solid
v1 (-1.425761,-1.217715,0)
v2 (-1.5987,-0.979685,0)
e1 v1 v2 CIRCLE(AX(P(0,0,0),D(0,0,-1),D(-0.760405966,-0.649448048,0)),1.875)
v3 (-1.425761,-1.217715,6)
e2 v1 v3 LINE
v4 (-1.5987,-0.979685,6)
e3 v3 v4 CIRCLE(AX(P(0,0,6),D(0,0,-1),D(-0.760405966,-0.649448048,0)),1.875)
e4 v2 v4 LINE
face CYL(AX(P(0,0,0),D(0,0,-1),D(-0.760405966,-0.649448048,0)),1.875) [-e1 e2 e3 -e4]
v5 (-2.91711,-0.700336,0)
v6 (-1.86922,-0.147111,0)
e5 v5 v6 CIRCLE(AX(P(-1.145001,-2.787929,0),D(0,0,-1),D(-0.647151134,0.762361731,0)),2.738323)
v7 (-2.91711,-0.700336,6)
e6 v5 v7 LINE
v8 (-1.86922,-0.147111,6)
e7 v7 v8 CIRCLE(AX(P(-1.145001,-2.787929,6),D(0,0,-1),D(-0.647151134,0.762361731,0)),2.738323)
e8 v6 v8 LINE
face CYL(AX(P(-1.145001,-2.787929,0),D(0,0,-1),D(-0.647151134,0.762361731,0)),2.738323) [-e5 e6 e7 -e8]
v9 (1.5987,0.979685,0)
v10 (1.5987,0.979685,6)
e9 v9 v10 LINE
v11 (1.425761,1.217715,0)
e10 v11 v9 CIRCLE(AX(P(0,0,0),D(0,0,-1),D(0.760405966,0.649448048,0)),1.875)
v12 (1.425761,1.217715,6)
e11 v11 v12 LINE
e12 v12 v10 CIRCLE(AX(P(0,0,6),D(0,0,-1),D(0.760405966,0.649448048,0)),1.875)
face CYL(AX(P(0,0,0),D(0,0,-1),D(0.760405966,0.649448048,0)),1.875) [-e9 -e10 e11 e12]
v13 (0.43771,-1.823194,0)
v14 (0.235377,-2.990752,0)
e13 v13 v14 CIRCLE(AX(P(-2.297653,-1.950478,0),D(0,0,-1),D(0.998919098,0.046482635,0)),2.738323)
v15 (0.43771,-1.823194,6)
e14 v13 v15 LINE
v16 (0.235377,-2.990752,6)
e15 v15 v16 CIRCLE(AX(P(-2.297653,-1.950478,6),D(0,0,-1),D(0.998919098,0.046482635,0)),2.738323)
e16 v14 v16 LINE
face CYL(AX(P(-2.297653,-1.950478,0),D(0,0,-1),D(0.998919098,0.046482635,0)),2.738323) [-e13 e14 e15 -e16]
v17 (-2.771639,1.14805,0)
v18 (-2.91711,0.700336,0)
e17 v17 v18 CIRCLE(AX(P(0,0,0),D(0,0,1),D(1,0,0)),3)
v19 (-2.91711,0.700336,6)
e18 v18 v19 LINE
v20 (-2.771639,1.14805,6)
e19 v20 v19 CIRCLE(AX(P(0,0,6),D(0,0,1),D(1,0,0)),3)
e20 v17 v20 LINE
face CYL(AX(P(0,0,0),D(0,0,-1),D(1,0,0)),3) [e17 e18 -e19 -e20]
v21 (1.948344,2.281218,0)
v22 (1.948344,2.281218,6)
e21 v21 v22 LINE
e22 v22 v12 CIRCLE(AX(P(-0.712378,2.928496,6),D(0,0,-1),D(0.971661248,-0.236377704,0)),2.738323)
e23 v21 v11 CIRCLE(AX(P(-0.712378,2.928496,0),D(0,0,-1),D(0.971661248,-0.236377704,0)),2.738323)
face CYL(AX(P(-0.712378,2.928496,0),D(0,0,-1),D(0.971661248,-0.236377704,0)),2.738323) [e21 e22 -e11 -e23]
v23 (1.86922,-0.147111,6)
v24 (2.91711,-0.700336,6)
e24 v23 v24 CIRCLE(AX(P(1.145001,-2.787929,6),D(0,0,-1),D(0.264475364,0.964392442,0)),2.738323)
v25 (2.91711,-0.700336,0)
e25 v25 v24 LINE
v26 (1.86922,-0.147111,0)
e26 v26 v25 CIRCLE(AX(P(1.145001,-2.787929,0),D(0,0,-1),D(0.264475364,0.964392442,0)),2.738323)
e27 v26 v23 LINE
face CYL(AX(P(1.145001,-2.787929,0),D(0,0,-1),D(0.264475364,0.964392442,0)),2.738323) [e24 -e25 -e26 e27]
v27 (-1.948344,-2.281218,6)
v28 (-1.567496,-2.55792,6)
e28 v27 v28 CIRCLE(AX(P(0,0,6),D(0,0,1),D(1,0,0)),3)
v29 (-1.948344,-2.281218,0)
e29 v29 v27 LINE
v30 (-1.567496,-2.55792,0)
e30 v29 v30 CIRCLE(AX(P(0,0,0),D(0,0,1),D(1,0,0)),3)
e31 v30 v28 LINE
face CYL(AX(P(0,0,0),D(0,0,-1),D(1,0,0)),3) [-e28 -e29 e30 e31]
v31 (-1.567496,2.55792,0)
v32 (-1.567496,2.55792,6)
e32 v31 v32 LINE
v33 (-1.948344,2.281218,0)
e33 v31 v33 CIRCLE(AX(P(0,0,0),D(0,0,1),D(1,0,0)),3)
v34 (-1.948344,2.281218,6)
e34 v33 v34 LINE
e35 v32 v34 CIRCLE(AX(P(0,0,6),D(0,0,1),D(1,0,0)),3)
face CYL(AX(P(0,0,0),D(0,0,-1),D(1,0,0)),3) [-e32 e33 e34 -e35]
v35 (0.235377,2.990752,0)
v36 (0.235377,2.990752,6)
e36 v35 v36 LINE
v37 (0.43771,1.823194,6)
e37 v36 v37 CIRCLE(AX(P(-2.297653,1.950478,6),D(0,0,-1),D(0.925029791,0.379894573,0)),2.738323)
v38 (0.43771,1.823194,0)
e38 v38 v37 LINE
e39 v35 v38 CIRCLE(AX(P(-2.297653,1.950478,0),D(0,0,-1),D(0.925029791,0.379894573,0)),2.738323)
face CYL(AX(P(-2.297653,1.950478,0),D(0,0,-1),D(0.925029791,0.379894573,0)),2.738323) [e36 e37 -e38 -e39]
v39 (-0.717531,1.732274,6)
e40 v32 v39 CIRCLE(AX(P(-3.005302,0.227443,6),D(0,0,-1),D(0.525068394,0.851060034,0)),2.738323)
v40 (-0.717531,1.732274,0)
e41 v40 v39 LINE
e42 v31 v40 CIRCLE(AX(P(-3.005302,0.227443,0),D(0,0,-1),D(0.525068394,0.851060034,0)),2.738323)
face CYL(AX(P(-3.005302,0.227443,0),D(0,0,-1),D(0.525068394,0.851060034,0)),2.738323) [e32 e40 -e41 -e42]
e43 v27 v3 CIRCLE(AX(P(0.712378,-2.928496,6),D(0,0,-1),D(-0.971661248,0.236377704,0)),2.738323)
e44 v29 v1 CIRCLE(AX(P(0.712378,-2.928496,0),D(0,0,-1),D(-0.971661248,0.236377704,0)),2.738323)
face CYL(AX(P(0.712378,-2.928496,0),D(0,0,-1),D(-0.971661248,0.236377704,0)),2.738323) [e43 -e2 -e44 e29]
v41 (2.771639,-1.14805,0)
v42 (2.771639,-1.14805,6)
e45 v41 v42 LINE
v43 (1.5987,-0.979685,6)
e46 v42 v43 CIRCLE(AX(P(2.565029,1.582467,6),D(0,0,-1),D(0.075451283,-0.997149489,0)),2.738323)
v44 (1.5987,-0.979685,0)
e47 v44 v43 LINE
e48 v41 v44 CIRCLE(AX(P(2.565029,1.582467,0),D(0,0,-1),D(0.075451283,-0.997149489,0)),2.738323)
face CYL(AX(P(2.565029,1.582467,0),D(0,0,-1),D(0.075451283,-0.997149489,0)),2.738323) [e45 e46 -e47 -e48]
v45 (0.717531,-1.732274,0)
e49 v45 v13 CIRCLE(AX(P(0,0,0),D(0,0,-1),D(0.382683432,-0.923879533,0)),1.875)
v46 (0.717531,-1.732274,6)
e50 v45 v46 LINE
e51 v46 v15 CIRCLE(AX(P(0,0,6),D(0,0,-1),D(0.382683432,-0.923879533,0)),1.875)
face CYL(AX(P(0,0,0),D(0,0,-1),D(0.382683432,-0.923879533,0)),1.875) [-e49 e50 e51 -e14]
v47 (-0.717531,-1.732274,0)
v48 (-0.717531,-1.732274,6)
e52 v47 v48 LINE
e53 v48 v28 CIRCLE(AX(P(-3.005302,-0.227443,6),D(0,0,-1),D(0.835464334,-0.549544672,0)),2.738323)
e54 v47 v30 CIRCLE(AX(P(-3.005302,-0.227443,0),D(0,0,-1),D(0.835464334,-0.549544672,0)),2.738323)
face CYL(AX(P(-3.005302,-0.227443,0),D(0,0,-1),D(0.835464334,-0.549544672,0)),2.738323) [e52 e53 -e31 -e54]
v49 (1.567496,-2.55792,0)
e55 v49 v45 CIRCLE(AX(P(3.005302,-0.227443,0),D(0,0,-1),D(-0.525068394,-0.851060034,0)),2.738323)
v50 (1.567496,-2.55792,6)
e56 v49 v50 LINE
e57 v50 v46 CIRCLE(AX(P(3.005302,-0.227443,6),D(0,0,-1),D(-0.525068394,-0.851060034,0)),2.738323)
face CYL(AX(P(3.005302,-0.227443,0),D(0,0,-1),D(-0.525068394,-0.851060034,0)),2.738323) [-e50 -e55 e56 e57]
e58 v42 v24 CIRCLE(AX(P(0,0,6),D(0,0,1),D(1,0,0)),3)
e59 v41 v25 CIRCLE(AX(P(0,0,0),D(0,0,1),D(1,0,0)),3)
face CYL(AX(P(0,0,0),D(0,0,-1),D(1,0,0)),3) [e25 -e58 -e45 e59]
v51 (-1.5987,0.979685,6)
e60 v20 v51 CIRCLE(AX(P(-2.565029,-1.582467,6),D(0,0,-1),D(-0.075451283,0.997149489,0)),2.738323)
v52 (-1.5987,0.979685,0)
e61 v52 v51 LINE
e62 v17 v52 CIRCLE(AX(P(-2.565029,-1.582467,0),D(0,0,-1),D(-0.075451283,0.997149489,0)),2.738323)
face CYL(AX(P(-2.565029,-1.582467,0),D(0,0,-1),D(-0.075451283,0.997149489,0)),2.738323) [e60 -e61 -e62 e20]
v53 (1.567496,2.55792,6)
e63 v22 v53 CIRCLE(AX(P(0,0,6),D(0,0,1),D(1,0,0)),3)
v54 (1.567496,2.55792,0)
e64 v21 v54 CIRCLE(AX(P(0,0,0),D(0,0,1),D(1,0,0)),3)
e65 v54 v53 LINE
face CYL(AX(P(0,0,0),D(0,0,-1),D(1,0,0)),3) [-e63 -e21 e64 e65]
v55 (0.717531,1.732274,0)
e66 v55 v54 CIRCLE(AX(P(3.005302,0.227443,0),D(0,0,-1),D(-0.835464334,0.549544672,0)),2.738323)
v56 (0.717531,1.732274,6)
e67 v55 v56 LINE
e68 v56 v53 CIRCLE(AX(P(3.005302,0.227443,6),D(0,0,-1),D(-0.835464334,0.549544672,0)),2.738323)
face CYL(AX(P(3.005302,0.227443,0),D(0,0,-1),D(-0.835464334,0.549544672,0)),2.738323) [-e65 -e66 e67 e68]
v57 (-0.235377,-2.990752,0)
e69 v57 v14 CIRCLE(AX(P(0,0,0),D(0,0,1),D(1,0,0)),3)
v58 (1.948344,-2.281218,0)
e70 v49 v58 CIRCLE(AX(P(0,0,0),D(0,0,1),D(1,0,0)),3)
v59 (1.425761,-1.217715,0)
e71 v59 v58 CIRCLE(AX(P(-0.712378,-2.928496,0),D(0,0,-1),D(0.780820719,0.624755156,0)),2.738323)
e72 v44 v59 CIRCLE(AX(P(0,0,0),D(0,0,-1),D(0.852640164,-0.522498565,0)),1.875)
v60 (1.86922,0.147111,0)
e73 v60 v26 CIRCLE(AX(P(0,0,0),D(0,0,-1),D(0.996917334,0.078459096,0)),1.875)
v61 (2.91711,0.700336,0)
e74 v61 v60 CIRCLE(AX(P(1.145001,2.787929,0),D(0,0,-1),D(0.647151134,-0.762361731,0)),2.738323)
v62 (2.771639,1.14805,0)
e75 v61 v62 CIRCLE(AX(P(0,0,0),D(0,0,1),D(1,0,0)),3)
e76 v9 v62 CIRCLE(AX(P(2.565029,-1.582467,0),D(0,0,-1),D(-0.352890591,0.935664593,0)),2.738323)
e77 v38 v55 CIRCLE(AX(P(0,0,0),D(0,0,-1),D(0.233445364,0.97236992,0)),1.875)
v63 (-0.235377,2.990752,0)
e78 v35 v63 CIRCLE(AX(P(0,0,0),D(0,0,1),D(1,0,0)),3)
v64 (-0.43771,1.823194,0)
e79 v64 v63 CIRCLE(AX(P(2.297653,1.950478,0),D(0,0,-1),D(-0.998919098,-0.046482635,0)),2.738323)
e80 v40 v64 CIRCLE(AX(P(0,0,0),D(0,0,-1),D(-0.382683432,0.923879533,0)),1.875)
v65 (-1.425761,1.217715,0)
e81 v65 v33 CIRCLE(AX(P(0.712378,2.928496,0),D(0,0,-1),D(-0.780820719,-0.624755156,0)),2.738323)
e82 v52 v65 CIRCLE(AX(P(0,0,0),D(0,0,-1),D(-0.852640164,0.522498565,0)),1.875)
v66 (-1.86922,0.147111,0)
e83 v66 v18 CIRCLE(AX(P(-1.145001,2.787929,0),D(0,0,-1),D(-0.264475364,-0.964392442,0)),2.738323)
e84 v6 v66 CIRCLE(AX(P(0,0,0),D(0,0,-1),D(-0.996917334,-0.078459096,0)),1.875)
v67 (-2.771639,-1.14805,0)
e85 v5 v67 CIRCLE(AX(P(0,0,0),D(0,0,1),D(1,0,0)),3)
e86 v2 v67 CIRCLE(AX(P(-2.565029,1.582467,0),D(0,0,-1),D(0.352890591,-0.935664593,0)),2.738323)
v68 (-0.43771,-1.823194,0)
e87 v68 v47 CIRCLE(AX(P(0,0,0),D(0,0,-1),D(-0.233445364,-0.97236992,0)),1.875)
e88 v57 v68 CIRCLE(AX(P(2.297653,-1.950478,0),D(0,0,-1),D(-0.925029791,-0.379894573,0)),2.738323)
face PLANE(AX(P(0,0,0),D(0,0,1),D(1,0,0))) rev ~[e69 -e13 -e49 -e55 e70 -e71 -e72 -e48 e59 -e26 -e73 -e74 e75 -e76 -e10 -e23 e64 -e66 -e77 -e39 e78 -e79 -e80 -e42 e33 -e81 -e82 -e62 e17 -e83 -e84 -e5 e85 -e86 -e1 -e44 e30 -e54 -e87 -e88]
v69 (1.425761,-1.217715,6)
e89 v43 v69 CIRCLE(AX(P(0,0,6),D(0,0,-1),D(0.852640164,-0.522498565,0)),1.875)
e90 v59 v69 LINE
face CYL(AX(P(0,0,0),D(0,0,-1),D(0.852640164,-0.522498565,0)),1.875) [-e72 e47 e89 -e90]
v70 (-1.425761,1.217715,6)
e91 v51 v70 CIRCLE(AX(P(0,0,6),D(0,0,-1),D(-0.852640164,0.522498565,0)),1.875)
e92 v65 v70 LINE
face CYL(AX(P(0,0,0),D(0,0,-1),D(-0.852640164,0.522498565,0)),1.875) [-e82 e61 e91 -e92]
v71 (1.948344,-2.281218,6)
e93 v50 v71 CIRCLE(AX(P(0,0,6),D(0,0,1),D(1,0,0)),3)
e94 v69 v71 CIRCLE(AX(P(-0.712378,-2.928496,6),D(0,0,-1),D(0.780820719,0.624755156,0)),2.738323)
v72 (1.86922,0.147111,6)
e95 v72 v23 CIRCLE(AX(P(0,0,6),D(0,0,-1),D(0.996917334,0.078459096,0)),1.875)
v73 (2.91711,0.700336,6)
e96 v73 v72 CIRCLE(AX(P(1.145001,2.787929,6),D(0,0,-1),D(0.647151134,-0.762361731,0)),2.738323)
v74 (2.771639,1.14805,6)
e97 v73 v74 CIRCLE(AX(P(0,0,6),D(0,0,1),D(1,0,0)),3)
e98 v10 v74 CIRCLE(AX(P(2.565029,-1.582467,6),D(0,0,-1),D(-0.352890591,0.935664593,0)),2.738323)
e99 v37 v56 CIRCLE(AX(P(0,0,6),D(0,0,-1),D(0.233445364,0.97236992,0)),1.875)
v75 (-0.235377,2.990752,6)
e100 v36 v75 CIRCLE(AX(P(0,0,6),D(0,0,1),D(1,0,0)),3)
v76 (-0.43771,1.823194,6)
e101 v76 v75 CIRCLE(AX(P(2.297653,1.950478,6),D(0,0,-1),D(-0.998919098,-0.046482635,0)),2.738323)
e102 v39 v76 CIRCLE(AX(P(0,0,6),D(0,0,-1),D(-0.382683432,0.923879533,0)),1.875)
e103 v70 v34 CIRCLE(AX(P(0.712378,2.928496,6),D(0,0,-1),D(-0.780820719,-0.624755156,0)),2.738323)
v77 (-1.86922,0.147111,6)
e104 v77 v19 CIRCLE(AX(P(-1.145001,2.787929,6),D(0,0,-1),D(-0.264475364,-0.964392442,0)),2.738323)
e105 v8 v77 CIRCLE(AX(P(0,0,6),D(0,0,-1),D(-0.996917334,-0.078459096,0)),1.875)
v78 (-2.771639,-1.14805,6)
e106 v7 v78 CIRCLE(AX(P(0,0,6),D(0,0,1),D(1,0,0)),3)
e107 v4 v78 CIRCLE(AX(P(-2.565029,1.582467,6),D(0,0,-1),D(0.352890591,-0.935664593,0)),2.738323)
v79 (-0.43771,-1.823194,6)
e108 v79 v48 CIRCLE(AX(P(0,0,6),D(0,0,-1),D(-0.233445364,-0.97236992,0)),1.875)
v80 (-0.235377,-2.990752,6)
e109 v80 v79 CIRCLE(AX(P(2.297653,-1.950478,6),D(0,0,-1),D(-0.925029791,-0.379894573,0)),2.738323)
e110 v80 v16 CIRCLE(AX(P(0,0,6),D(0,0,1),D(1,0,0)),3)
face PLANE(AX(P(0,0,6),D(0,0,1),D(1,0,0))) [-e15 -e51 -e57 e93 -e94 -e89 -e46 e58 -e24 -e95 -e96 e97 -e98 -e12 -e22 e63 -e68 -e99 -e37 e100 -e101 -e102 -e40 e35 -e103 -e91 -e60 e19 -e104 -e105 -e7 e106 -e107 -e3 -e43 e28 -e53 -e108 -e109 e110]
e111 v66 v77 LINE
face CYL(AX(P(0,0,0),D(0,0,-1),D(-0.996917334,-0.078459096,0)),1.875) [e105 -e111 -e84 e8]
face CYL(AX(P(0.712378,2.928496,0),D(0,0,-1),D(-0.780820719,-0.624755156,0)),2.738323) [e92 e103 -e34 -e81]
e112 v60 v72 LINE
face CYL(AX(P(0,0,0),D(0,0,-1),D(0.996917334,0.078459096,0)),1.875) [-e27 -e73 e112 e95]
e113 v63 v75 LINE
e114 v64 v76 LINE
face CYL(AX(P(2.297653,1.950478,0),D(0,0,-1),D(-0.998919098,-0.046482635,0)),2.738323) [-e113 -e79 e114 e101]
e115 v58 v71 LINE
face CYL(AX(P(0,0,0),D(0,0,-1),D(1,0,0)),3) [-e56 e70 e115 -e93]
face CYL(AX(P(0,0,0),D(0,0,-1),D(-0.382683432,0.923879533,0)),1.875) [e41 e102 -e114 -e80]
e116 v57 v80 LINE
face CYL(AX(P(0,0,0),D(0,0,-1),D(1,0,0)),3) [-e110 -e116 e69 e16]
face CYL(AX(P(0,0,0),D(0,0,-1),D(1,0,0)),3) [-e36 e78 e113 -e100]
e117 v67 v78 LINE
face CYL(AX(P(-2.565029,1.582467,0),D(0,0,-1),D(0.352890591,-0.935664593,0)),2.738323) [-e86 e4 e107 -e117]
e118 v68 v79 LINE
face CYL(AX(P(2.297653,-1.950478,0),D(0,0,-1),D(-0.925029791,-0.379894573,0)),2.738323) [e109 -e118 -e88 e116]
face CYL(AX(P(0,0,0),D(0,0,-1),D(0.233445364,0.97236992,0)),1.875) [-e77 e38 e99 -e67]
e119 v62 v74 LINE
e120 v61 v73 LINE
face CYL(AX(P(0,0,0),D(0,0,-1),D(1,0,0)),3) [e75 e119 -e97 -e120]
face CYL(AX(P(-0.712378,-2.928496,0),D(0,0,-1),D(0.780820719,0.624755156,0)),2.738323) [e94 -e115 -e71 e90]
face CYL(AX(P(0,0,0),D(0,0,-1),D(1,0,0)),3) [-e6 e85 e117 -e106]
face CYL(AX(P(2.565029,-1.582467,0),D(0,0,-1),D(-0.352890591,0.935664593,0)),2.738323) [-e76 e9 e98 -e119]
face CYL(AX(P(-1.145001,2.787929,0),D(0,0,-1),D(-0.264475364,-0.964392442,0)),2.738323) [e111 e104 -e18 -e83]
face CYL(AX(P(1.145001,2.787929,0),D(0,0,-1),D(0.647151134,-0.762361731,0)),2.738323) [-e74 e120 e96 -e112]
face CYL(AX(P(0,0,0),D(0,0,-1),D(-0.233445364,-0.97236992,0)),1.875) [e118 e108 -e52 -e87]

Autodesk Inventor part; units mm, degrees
sketch "Sketch1" plane through (0, 0, 0) normal (0, 0, 1) x (1, 0, 0)
  circle A0 centre (0, 0) radius 3
  dimension "d0" = 6
extrude "Extrusion1" add sketch "Sketch1" along normal blind 6
ref_plane "Work Plane2" through (0, 0, 3) normal (0, 0, 1) x (1, 0, 0)
sketch "Sketch2" plane through (0, 0, 0) normal (0, 0, -1) x (-1, 0, 0)
  circle A0 centre (0, 0) radius 3 projected
  circle A1 centre (0, 0) radius 2.5
  dimension "d3" = 5
surface extrude "Pitch Diameter" sketch "Sketch2" against normal through all shown no curves A1
ref_plane "Work Plane8" through (0, 0, 0) normal (0.9510565, 0.309017, 0) x (0, 0, 1)
ref_plane "Work Plane9" through (0, 0, 0) normal (1, 0, 0) x (0, 1, 0)
spur gear teeth "Spur Gear" teeth 10 pitch diameter 5 tip diameter 6 root diameter 3.75 face width 6 start plane through (0, 0, 0) normal (0, 0, -1) x (-1, 0, 0)
equation "\"d0\" = da_da"
equation "\"d1\" = da_b"
equation "\"d3\" = da_d"
equation "\"d16\" = da_aw"
equation "\"d43\" = da_aw"
equation "\"d46\" = da_aw"
equation "\"da_da\" = 6"
equation "\"da_b\" = 6"
equation "\"da_d\" = 5"
equation "\"da_aw\" = 16.75"
properties part number "Spur Gear1" material "Steel"
